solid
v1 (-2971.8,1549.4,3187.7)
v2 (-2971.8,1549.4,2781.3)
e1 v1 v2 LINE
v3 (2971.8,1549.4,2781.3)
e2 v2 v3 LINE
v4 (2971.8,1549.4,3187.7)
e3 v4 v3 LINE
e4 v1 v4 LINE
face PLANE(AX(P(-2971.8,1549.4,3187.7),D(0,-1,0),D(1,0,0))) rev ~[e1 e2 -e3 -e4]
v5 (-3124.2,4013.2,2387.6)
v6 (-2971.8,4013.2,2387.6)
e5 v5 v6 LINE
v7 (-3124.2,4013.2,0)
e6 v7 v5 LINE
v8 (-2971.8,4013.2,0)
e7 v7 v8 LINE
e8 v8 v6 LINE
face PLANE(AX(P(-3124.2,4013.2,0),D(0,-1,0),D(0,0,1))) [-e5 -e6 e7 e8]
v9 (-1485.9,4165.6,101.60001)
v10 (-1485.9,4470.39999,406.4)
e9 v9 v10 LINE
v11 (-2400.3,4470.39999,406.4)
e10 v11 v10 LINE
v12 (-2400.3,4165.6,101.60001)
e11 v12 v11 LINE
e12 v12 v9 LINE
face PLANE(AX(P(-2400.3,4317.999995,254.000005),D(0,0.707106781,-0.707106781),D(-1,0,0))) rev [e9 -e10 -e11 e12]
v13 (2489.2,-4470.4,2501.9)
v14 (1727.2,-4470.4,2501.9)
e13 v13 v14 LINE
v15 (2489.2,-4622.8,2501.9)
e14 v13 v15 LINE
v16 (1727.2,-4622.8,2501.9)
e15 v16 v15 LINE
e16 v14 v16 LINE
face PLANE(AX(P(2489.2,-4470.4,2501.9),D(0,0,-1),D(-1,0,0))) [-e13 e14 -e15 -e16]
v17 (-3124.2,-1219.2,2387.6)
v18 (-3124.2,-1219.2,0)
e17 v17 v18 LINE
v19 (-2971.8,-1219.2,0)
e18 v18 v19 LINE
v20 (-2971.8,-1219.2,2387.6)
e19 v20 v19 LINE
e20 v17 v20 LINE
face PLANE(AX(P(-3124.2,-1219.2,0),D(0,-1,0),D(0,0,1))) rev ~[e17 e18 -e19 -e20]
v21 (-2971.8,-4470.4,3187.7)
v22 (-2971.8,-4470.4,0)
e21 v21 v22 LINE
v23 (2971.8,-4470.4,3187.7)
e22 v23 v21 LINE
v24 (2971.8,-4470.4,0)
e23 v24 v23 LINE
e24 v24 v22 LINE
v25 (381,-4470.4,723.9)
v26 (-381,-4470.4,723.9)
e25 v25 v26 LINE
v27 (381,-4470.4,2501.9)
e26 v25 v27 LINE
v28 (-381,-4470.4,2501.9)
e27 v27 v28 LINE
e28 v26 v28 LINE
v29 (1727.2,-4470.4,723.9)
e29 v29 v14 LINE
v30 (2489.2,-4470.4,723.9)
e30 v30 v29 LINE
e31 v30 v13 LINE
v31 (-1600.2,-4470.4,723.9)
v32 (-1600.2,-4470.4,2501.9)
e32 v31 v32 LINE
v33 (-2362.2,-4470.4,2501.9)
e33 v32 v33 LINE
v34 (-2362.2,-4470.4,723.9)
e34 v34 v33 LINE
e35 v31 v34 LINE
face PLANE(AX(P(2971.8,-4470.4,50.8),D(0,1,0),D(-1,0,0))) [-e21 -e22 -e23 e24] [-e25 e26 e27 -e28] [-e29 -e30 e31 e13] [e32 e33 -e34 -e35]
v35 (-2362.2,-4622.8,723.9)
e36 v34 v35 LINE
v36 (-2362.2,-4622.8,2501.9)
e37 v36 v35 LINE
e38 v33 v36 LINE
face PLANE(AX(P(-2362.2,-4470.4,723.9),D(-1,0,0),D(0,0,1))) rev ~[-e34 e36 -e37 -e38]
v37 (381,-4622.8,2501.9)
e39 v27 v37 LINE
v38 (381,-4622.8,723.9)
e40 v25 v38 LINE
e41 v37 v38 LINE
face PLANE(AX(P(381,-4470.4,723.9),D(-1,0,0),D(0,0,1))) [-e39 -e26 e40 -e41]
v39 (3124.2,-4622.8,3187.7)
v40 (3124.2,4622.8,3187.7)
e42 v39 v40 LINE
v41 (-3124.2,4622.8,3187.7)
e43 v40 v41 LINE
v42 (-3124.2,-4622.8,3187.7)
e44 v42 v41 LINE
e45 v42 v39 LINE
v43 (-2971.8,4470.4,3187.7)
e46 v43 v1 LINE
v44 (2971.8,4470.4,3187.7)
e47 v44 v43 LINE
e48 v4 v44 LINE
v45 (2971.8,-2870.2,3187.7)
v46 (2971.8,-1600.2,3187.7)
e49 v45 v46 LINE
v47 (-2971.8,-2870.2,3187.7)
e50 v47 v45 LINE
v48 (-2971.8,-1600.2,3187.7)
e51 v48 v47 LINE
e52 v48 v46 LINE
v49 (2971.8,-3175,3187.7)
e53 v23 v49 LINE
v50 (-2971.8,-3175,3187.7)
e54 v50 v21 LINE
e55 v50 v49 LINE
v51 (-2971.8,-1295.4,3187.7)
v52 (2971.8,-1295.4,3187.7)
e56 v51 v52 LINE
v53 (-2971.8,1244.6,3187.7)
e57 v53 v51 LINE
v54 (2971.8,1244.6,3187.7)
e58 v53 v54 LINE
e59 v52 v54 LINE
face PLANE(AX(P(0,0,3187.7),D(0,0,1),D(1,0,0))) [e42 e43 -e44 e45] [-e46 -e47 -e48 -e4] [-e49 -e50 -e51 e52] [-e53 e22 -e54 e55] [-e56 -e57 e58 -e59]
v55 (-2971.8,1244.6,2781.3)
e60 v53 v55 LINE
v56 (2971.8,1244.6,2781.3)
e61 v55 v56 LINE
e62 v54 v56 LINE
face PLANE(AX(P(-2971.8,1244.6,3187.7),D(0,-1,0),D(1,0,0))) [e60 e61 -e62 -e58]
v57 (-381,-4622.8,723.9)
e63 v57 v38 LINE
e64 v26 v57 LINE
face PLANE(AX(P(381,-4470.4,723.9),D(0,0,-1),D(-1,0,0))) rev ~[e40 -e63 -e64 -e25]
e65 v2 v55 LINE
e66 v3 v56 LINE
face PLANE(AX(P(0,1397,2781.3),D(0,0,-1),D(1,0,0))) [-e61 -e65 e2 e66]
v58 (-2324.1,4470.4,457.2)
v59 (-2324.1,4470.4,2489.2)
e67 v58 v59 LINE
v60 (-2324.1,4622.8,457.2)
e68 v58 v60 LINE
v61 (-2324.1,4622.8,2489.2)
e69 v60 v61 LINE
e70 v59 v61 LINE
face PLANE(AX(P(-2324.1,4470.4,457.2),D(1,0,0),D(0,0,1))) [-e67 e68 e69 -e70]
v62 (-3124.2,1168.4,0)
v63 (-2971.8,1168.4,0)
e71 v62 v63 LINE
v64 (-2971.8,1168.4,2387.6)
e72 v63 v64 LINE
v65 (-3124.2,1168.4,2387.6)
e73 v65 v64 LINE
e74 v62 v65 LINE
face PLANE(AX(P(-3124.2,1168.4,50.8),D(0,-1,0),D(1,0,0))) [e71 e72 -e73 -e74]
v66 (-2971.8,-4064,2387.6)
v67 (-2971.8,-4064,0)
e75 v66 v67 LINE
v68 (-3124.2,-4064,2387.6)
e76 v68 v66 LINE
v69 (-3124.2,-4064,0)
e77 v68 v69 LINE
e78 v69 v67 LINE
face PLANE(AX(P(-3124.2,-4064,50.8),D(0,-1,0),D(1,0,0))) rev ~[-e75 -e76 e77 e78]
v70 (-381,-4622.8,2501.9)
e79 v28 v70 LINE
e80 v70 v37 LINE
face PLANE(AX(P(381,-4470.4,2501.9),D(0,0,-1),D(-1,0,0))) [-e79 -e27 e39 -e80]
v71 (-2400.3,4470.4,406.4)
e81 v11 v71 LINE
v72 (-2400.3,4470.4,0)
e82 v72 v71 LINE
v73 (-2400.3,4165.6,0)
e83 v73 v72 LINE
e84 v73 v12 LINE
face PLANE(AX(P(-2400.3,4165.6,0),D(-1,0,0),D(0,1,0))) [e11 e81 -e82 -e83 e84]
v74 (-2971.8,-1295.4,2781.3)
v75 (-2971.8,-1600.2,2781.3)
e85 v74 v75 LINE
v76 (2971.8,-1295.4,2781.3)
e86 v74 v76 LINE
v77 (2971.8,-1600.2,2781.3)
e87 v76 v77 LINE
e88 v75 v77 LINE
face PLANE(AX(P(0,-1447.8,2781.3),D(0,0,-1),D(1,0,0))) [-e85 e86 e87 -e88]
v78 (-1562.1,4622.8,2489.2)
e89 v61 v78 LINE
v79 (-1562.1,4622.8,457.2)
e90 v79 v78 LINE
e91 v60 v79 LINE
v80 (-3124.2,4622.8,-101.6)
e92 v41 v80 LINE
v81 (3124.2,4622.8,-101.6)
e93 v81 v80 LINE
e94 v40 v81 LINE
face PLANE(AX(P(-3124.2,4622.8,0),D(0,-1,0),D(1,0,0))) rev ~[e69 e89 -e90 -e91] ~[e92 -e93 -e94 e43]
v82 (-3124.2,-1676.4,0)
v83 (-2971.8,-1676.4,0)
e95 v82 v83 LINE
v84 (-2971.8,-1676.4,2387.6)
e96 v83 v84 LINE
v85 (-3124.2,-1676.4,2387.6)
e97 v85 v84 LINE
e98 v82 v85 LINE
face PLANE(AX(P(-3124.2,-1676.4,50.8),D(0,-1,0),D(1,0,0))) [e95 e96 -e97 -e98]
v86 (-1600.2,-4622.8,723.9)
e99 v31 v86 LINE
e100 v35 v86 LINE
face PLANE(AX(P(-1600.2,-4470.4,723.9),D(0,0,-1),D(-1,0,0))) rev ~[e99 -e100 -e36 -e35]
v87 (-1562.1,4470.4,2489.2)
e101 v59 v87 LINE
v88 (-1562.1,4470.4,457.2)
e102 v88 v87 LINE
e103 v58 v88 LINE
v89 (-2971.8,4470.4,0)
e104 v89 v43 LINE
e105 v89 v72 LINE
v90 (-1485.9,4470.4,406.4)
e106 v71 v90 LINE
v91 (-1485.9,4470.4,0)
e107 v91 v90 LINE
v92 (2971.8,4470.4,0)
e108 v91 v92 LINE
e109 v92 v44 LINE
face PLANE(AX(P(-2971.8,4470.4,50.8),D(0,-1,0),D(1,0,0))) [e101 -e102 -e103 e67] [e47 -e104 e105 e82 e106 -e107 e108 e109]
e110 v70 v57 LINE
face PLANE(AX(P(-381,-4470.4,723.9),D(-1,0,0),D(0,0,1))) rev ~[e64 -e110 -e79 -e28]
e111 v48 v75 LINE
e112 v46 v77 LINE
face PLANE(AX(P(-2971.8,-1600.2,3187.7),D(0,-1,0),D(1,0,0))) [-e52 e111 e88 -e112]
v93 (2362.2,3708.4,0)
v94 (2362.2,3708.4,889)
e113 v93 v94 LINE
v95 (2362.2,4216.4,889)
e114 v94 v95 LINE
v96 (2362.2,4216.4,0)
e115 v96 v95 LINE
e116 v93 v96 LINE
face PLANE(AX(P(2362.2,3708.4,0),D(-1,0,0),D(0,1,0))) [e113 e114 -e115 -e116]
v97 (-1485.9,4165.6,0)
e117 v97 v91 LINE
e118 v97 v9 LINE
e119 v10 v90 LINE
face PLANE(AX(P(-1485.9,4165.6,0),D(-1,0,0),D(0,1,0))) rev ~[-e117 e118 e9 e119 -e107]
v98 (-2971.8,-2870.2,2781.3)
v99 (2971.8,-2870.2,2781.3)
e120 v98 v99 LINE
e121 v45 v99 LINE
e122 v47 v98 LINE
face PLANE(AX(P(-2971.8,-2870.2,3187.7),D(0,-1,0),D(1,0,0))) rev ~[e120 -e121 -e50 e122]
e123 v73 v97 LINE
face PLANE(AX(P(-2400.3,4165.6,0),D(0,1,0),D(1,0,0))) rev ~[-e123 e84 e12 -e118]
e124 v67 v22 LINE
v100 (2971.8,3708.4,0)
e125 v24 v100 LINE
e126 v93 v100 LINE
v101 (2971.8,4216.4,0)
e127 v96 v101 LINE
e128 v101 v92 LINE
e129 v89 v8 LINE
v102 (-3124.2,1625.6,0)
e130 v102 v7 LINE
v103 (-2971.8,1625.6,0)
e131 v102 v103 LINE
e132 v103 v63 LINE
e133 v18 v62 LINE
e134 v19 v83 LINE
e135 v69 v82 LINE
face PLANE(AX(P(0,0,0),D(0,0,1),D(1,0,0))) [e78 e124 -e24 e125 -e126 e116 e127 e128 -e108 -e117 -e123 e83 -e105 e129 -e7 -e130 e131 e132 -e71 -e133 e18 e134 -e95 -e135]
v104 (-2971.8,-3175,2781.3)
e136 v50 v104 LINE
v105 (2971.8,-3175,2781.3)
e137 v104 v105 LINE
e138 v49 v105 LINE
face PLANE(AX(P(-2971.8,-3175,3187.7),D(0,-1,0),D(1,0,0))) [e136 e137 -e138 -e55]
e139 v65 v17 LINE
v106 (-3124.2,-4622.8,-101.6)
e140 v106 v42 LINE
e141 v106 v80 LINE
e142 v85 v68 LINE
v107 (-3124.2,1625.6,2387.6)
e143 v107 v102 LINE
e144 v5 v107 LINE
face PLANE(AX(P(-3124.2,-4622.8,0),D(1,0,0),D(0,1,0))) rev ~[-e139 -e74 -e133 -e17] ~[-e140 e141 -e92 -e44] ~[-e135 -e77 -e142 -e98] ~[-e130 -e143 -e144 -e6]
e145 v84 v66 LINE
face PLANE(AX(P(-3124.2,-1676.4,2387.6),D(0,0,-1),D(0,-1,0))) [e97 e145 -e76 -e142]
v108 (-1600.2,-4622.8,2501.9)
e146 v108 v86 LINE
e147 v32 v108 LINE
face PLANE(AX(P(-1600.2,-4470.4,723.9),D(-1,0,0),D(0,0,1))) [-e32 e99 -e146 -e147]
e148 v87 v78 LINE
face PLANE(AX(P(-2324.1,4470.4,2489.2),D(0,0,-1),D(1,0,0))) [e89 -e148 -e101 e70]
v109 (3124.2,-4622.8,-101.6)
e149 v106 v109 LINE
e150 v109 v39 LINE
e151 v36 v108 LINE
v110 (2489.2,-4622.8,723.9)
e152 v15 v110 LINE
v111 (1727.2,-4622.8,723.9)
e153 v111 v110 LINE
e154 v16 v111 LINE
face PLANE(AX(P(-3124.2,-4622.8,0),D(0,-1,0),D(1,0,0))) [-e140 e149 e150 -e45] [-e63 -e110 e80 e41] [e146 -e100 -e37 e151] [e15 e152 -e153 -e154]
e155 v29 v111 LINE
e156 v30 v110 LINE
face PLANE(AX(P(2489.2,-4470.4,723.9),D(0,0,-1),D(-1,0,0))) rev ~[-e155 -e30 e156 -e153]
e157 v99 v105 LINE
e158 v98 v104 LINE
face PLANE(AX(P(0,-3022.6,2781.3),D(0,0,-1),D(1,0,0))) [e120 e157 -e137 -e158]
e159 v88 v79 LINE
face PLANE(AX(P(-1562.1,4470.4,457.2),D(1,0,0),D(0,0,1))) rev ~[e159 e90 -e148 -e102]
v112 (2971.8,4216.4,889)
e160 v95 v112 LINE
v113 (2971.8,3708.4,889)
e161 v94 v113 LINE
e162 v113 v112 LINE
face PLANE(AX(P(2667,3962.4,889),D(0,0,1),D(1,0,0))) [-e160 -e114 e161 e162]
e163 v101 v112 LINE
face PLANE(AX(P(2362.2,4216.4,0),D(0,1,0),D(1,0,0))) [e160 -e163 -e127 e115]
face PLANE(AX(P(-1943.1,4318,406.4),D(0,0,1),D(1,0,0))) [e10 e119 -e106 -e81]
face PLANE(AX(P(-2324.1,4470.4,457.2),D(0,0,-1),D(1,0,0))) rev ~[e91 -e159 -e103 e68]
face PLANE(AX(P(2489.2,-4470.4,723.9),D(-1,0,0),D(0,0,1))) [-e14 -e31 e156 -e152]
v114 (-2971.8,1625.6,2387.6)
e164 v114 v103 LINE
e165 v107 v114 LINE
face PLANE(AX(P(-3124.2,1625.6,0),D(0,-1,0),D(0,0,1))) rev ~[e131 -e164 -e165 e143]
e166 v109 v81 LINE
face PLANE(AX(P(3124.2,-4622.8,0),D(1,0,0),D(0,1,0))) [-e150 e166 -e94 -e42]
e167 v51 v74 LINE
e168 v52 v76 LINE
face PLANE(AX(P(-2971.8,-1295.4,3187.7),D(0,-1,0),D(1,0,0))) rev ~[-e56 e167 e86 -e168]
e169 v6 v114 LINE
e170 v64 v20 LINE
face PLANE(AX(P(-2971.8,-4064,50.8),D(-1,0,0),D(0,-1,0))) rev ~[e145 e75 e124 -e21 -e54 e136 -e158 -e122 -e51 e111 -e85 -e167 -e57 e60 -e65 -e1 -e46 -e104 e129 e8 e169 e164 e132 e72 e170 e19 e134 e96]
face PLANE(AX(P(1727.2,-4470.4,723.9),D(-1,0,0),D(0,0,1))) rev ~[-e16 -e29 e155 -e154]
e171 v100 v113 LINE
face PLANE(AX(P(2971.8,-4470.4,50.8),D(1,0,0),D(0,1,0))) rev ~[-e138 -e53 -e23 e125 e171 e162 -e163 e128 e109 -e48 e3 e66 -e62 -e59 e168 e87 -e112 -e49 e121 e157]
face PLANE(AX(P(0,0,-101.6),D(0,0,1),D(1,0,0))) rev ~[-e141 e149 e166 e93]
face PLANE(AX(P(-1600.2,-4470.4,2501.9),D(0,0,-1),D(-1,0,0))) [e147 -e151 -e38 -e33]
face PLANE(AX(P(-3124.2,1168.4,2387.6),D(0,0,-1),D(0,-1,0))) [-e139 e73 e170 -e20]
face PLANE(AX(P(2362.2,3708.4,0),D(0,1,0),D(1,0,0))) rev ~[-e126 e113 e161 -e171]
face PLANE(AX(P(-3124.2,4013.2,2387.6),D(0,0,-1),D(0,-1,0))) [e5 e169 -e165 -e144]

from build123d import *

# Parameters (mm, degrees)
F0_W          = 6248.4
F0_H          = 9245.6
F1_DEPTH      = 3340.1
F1_DEPTH_BACK = 101.6
F3_T          = -152.4
F2_W          = 9245.6
F2_H          = 3441.7
F2_W_2        = 2387.6
F2_H_2        = 2387.6
F4_DEPTH      = 152.4
F5_DEPTH      = 50.8
F6_W          = 914.4
F6_H          = 304.8
F7_DEPTH      = 406.4
F8_SIZE       = 304.79999
F9_W          = 5943.6
F9_H          = 304.8
F10_DEPTH     = 406.4
F11_W         = 762
F11_H         = 1778
F12_DEPTH     = 152.401
F13_W         = 609.6
F13_H         = 508
F14_DEPTH     = 889
F15_W         = 762
F15_H         = 2032
F16_DEPTH     = 152.401
F17_DEPTH     = 152.4


# Not quite as in the source:
# - a fillet or chamfer is up to 0.001 mm smaller than in the source, because OpenCascade refuses the exact size


with BuildPart() as f1:
    # F0 (on Top) → F1 (new body, two sides)
    with BuildSketch(Plane.XY) as f1_sk:
        Rectangle(F0_W, F0_H)
    extrude(amount=F1_DEPTH)
    extrude(f1_sk.sketch, amount=-F1_DEPTH_BACK)

    # F3
    f3_openings = [f1.faces().sort_by_distance(p)[0] for p in [
        (-3124.2, 0, 1619.25),
    ]]
    offset(amount=F3_T, openings=f3_openings)

    # F2 (on face) → F4 (join)
    with BuildSketch(Plane(origin=(-3124.2, 0, 0), x_dir=(0, -1, 0), z_dir=(-1, 0, 0))):
        with Locations((0, 1619.25)):
            Rectangle(F2_W, F2_H)
        with Locations((-2819.4, 1193.8)):
            Rectangle(F2_W_2, F2_H_2, mode=Mode.SUBTRACT)
        with Locations((25.4, 1193.8)):
            Rectangle(F2_W_2, F2_H_2, mode=Mode.SUBTRACT)
        with Locations((2870.2, 1193.8)):
            Rectangle(F2_W_2, F2_H_2, mode=Mode.SUBTRACT)
    extrude(amount=-F4_DEPTH)

    # F5 (cut): a face of the model
    f5_faces = [f1.faces().sort_by_distance(p)[0] for p in [
        (-61.3516059957, -0.5112633833, 50.8),
    ]]
    extrude(f5_faces, amount=-F5_DEPTH, mode=Mode.SUBTRACT)

    # F6 (on face) → F7 (join)
    with BuildSketch(Plane.XY):
        with Locations((-1943.1, 4318)):
            Rectangle(F6_W, F6_H)
    extrude(amount=F7_DEPTH)

    # F8 (size 304.8 in the source; OpenCascade refuses exactly that, so slightly less here)
    f8_edges = [f1.edges().sort_by_distance(p)[0] for p in [
        (-1943.1, 4165.6, 406.4),
    ]]
    chamfer(f8_edges, length=F8_SIZE)

    # F9 (on face) → F10 (join)
    with BuildSketch(Plane(origin=(0, 0, 3187.7), x_dir=(1, 0, 0), z_dir=(0, 0, -1))):
        with Locations((0, 1447.8)):
            Rectangle(F9_W, F9_H)
        with Locations((0, -1397)):
            Rectangle(F9_W, F9_H)
        with Locations((0, 3022.6)):
            Rectangle(F9_W, F9_H)
    extrude(amount=F10_DEPTH)

    # F11 (on face) → F12 (cut, through all)
    with BuildSketch(Plane(origin=(0, -4470.4, 0), x_dir=(-1, 0, 0), z_dir=(0, 1, 0))):
        with Locations((1981.2, 1612.9)):
            Rectangle(F11_W, F11_H)
        with Locations((0, 1612.9)):
            Rectangle(F11_W, F11_H)
        with Locations((-2108.2, 1612.9)):
            Rectangle(F11_W, F11_H)
    extrude(amount=-F12_DEPTH, mode=Mode.SUBTRACT)

    # F13 (on face) → F14 (join)
    with BuildSketch(Plane.XY):
        with Locations((2667, 3962.4)):
            Rectangle(F13_W, F13_H)
    extrude(amount=F14_DEPTH)

    # F15 (on face) → F16 (cut, through all)
    with BuildSketch(Plane.XZ.offset(-4470.4)):
        with Locations((-1943.1, 1473.2)):
            Rectangle(F15_W, F15_H)
    extrude(amount=-F16_DEPTH, mode=Mode.SUBTRACT)

    # F17 (cut): a face of the model
    f17_faces = [f1.faces().sort_by_distance(p)[0] for p in [
        (0, 0, 3340.1),
    ]]
    extrude(f17_faces, amount=-F17_DEPTH, mode=Mode.SUBTRACT)


solid = f1.part
